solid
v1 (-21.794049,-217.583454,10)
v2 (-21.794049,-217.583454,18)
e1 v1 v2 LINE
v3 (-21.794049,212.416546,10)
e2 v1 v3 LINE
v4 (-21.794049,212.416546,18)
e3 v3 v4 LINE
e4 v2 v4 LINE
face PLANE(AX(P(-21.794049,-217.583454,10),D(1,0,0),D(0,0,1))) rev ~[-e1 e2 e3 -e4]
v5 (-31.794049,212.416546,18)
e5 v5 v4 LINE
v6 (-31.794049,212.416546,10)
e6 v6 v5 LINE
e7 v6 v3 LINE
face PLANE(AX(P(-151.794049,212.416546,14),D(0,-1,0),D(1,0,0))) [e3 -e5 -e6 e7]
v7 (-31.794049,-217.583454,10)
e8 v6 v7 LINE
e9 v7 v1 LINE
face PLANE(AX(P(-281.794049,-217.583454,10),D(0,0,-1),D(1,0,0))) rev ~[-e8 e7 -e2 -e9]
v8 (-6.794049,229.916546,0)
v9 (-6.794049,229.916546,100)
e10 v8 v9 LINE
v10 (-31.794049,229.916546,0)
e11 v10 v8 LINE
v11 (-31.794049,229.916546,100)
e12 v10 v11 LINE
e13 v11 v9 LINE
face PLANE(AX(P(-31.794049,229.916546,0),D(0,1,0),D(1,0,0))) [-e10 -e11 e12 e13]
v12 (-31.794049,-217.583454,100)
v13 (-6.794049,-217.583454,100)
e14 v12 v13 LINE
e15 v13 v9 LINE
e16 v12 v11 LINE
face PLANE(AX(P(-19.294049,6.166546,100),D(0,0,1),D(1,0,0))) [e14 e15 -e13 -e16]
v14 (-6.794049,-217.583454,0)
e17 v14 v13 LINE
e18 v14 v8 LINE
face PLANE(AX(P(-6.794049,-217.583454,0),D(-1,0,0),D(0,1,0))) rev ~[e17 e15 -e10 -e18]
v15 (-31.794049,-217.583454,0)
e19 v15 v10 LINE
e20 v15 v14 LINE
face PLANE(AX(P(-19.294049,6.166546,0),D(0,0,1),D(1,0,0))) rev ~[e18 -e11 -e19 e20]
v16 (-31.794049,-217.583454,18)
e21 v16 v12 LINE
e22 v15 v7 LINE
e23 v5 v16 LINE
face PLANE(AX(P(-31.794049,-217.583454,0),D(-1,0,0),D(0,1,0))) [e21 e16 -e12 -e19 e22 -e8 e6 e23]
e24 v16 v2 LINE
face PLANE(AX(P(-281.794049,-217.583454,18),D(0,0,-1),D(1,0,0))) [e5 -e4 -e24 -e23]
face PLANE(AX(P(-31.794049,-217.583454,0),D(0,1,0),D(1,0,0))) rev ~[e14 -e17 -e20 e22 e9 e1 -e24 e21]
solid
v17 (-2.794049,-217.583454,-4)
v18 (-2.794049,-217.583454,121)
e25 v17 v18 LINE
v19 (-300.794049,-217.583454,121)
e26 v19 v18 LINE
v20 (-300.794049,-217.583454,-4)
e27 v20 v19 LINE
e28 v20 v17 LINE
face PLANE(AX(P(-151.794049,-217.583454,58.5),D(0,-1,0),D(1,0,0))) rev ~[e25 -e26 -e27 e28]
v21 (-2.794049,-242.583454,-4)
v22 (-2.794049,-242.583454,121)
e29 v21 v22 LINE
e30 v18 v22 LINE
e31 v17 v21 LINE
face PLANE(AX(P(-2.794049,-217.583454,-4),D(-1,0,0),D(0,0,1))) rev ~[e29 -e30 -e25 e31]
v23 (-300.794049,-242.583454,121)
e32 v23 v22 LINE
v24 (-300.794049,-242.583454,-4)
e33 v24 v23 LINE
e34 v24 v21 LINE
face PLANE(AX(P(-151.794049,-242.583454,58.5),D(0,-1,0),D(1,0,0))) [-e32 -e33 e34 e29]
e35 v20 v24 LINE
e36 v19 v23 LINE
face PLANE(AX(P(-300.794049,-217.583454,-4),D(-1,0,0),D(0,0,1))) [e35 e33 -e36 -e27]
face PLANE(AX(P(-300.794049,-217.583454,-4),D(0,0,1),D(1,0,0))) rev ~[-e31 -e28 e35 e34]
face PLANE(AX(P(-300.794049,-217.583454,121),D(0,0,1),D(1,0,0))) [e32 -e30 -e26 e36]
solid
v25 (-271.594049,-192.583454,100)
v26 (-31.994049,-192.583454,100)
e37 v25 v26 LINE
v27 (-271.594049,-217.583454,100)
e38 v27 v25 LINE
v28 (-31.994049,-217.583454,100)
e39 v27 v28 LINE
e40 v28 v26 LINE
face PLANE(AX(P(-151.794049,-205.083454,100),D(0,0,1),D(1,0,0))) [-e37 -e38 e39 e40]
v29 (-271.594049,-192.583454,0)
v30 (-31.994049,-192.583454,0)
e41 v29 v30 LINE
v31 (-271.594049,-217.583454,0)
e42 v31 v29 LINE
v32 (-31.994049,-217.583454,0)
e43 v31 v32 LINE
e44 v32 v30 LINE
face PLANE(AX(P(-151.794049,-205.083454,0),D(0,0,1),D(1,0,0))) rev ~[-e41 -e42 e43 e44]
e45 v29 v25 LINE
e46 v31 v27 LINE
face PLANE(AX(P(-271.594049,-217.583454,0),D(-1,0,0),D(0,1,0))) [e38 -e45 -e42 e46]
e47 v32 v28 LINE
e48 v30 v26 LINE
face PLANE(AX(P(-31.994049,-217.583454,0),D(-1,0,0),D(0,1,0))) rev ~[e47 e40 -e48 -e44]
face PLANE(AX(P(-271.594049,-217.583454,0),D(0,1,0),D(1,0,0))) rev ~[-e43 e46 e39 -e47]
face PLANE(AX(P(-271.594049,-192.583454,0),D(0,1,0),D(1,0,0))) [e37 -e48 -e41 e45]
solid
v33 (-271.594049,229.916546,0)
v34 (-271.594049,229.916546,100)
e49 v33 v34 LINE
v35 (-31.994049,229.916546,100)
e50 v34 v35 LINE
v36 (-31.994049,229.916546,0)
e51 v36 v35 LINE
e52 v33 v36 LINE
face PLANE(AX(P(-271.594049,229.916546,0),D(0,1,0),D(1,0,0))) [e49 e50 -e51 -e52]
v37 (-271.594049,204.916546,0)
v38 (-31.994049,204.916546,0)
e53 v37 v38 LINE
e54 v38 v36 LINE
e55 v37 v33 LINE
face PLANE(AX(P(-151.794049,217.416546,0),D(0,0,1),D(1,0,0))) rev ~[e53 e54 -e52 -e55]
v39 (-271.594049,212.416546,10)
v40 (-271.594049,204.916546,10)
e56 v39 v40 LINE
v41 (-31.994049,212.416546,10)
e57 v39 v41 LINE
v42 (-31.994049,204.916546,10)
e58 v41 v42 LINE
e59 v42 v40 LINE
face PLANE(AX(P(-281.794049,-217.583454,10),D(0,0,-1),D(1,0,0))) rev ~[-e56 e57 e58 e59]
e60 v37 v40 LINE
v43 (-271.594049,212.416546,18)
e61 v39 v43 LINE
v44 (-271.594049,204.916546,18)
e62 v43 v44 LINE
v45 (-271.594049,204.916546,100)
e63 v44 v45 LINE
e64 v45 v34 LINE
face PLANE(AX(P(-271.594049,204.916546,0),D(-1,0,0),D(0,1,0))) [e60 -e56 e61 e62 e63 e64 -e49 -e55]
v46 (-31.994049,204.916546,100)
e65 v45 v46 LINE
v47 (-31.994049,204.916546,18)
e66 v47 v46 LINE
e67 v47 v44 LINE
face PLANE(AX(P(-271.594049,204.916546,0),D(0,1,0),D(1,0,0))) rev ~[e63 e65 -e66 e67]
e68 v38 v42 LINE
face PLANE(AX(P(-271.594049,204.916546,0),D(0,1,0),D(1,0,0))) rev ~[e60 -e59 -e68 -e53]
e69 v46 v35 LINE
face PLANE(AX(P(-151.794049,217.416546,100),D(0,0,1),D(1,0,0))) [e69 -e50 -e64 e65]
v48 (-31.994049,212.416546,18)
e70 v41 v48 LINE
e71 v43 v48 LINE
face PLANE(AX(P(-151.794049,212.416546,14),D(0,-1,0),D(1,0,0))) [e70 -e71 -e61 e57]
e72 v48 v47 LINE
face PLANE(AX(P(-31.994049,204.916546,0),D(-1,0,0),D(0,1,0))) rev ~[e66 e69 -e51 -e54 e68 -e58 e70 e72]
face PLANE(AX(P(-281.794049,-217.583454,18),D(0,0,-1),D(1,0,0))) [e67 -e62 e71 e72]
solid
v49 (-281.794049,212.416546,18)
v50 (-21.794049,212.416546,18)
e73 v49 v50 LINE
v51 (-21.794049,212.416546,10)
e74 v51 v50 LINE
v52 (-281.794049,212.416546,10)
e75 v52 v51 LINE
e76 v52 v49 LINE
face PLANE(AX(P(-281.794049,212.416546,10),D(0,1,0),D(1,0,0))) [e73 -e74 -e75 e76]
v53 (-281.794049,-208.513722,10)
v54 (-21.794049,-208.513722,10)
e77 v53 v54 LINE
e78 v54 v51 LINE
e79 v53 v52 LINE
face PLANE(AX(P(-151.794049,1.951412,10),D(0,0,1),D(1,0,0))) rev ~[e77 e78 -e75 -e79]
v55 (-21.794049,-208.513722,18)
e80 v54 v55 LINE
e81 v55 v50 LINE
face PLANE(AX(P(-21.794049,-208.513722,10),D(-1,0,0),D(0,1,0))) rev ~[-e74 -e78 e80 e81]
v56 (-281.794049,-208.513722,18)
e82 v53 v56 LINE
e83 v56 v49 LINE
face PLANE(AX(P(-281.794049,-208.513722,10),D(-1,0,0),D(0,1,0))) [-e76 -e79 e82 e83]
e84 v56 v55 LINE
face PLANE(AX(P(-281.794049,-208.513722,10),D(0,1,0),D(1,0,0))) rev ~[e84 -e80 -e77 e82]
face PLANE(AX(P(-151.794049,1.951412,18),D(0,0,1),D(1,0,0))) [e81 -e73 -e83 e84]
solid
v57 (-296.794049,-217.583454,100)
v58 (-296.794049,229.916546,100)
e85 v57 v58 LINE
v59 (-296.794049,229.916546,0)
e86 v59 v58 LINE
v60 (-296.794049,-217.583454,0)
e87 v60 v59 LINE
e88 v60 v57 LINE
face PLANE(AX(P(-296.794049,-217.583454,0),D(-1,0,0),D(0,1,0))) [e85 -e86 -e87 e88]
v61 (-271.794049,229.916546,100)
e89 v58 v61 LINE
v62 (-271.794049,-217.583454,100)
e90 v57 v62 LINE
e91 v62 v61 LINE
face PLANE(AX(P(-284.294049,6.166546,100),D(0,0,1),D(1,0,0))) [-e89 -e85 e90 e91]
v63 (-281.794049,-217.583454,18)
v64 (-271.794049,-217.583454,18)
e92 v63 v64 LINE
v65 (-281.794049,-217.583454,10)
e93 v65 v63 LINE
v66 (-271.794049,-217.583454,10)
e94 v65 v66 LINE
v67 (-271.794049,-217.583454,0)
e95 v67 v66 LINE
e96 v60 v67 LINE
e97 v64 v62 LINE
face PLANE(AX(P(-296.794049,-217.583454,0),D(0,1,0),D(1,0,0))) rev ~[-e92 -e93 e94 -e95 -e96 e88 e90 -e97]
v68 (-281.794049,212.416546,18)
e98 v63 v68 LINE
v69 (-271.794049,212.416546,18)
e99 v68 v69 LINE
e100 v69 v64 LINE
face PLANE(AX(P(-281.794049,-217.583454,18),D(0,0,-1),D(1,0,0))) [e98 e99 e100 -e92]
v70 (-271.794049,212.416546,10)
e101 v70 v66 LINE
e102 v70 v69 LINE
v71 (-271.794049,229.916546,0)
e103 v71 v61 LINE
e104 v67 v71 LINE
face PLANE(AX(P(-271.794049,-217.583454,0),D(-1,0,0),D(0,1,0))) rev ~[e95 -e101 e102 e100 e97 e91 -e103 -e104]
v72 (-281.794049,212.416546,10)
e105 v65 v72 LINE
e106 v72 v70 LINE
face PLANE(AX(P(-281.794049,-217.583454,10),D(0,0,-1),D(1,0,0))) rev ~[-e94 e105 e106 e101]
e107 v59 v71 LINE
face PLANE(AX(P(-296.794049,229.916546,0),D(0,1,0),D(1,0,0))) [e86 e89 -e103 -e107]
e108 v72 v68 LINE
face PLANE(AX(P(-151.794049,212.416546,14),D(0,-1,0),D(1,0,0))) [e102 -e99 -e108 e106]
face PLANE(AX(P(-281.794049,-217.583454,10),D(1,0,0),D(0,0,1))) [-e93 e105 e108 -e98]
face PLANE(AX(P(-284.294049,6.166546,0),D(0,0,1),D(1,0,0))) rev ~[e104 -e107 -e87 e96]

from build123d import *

# Parameters (mm, degrees)
F0_W     = 25
F0_H     = 447.5
F1_DEPTH = 100
F0_W_2   = 239.6
F0_H_2   = 25
F2_W     = 260
F2_H     = 8
F3_DEPTH = 430
F4_W     = 260
F4_H     = 420.9302674979
F5_DEPTH = 8
F6_W     = 298
F6_H     = 125
F7_DEPTH = 25


with BuildPart() as f1:
    # F0 (on Top) → F1 (new body)
    with BuildSketch(Plane.XY):
        with Locations((-284.2940492184, 6.1665456742)):
            Rectangle(F0_W, F0_H)
    extrude(amount=F1_DEPTH)


with BuildPart() as f1b:
    # F0 (on Top) → F1, piece 2 (new body)
    with BuildSketch(Plane.XY):
        with Locations((-19.2940492184, 6.1665456742)):
            Rectangle(F0_W, F0_H)
    extrude(amount=F1_DEPTH)


with BuildPart() as f1c:
    # F0 (on Top) → F1, piece 3 (new body)
    with BuildSketch(Plane.XY):
        with Locations((-151.7940492184, 217.4165456742)):
            Rectangle(F0_W_2, F0_H_2)
    extrude(amount=F1_DEPTH)


with BuildPart() as f1d:
    # F0 (on Top) → F1, piece 4 (new body)
    with BuildSketch(Plane.XY):
        with Locations((-151.7940492184, -205.0834543258)):
            Rectangle(F0_W_2, F0_H_2)
    extrude(amount=F1_DEPTH)


with BuildPart() as f3_tool:
    # F2 (on face) → F3 (new body)
    with BuildSketch(Plane.XZ.offset(217.5834543258)):
        with Locations((-151.7940492184, 14)):
            Rectangle(F2_W, F2_H)
    extrude(amount=-F3_DEPTH)


with BuildPart() as f1_1:
    add(f1.part)

    # F3: cut by f3_tool
    add(f3_tool.part, mode=Mode.SUBTRACT)


with BuildPart() as f1b_1:
    add(f1b.part)

    # F3: cut by f3_tool
    add(f3_tool.part, mode=Mode.SUBTRACT)


with BuildPart() as f1c_1:
    add(f1c.part)

    # F3: cut by f3_tool
    add(f3_tool.part, mode=Mode.SUBTRACT)


with BuildPart() as f5:
    # F4 (on face) → F5 (new body)
    with BuildSketch(Plane.XY.offset(10)):
        with Locations((-151.7940492184, 1.9514119253)):
            Rectangle(F4_W, F4_H)
    extrude(amount=F5_DEPTH)


with BuildPart() as f7:
    # F6 (on face) → F7 (new body)
    with BuildSketch(Plane.XZ.offset(217.5834543258)):
        with Locations((-151.7940492184, 58.5)):
            Rectangle(F6_W, F6_H)
    extrude(amount=F7_DEPTH)


solid = Compound([f1d.part, f1_1.part, f1b_1.part, f1c_1.part, f5.part, f7.part])
